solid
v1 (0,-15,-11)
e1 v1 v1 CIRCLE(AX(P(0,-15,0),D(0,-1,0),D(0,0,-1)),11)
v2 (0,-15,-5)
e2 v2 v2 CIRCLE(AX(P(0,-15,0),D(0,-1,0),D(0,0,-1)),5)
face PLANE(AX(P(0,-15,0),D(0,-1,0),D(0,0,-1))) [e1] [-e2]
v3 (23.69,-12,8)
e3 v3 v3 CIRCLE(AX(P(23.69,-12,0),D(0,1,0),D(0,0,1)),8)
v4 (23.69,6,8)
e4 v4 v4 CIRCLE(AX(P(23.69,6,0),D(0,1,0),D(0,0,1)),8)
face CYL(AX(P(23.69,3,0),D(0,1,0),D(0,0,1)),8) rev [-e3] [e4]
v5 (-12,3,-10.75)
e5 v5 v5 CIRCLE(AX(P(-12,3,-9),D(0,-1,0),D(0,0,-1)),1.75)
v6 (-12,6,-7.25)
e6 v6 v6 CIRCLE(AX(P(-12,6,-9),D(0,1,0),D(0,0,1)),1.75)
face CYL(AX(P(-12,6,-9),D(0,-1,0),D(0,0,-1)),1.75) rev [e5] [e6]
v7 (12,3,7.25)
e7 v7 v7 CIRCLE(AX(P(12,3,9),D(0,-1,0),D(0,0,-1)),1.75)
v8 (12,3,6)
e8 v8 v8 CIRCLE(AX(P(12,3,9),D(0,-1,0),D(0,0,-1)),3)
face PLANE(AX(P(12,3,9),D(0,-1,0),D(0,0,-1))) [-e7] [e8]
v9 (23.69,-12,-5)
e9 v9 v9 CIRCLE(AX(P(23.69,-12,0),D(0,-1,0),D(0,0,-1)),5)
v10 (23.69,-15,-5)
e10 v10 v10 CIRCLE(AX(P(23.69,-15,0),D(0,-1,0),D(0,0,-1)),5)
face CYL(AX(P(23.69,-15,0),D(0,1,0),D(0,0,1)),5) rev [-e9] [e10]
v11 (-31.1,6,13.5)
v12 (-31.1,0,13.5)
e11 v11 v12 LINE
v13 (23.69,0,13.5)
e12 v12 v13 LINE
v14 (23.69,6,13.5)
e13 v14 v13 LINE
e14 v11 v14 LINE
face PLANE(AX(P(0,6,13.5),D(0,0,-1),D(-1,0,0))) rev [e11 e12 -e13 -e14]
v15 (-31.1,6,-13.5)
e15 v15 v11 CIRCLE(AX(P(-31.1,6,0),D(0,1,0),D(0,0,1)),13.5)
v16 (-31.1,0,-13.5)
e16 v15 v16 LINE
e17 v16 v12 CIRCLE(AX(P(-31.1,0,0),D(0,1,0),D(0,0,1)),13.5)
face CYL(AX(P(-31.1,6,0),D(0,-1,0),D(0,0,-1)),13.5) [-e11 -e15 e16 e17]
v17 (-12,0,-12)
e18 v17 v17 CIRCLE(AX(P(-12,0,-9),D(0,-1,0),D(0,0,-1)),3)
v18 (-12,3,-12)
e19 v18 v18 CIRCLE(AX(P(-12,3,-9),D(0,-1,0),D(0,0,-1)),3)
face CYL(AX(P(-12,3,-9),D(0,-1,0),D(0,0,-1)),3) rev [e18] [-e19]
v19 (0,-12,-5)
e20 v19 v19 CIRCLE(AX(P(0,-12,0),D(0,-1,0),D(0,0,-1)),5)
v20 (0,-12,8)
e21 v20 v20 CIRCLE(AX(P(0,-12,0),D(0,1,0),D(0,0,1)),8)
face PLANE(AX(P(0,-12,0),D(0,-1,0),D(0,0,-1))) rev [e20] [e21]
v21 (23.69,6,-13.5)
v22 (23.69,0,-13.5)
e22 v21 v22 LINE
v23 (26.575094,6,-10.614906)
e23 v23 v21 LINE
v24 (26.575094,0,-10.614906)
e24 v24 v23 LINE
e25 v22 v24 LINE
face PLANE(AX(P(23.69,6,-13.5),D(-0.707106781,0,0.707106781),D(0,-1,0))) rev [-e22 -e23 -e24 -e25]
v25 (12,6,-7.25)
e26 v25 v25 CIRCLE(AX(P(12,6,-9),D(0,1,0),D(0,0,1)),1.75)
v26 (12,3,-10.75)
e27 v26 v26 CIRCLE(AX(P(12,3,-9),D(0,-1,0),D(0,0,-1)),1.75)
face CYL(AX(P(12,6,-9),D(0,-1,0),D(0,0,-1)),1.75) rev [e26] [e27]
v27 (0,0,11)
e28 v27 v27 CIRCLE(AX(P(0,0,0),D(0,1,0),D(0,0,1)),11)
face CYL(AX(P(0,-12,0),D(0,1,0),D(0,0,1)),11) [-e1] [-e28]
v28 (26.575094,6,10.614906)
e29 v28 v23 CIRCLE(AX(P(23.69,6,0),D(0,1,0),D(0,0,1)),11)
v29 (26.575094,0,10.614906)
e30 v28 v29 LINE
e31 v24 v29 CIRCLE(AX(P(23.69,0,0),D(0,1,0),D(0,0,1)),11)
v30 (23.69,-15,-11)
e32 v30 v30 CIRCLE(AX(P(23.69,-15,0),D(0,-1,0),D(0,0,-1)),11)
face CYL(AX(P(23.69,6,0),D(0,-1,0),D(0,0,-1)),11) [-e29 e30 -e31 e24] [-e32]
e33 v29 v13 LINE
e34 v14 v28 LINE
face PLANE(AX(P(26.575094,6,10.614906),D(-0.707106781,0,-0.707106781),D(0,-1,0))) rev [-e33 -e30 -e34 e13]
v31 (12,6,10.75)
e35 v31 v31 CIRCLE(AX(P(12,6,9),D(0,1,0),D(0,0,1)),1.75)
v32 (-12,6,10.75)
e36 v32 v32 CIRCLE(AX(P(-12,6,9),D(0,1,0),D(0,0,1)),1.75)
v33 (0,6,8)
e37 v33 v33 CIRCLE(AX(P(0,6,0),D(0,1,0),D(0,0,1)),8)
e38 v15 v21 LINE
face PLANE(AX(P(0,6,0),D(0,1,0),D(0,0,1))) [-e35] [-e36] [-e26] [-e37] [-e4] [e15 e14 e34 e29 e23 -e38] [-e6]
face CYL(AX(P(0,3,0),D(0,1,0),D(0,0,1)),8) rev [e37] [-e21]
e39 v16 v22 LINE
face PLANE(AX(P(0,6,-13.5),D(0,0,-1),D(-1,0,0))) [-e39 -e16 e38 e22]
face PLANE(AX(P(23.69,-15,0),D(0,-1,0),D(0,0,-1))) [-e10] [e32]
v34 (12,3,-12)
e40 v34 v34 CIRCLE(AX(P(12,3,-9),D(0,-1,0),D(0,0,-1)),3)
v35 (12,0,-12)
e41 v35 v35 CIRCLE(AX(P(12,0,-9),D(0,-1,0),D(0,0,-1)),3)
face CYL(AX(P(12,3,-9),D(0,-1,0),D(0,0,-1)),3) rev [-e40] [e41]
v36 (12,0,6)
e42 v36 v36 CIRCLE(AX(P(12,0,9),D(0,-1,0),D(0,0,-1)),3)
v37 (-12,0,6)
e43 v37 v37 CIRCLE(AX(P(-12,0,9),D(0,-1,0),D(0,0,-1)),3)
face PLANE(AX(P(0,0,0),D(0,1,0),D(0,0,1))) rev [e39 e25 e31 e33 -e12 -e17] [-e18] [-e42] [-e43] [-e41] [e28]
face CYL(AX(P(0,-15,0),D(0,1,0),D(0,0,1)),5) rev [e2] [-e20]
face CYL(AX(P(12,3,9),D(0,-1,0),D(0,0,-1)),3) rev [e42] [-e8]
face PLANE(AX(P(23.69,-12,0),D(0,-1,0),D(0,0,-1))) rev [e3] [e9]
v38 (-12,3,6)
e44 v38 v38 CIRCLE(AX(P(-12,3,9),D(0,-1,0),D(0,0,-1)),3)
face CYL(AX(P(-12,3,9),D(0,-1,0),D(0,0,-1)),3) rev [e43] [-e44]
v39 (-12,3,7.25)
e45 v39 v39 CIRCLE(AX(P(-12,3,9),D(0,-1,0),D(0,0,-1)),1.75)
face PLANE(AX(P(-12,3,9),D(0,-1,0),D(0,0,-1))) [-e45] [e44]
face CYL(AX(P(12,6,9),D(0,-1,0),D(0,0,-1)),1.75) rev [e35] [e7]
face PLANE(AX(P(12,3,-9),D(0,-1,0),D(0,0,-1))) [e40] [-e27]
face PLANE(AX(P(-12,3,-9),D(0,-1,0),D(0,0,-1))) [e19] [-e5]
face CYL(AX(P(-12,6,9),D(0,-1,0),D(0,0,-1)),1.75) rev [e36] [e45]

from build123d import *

# Parameters (mm, degrees)
SKETCH1_R               = 1.75
SKETCH1_R_2             = 5
BOSS_EXTRUDE1_DEPTH     = 6
SKETCH2_R               = 3
SKETCH2_R_2             = 1.75
CUT_EXTRUDE1_DEPTH      = 3
CUT_EXTRUDE2_START      = -3
SKETCH3_R               = 8
SKETCH3_R_2             = 5
CUT_EXTRUDE2_DEPTH      = 3
SKETCH5_R               = 13.5
BOSS_EXTRUDE2_DEPTH     = 6
CUT_EXTRUDE3_DEPTH      = 47.983082062
CUT_EXTRUDE3_DEPTH_BACK = 47.983082062
SKETCH6_R               = 8
BOSS_EXTRUDE6_START     = -12
SKETCH9_R               = 11
SKETCH9_R_2             = 8
BOSS_EXTRUDE6_DEPTH     = 12
BOSS_EXTRUDE7_START     = 3
SKETCH10_R              = 11
SKETCH10_R_2            = 5
BOSS_EXTRUDE7_DEPTH     = 3
CHAMFER3_SIZE           = 2.5


with BuildPart() as part:
    # Sketch1 → Boss-Extrude1 (new body)
    with BuildSketch(Plane(origin=(0, 0, 0), x_dir=(1, 0, 0), z_dir=(0, 1, 0))):
        with BuildLine():
            Line((23.69, 13.5), (-31.1, 13.5))
            Line((-31.1, 13.5), (-31.1, 10.5))
            ThreePointArc((-31.1, 10.5), (-20.6, 0), (-31.1, -10.5))
            Line((-31.1, -10.5), (-31.1, -13.5))
            Line((-31.1, -13.5), (23.69, -13.5))
            Line((23.69, -13.5), (23.69, -11))
            ThreePointArc((23.69, -11), (34.69, 0), (23.69, 11))
            Line((23.69, 11), (23.69, 13.5))
        make_face()
        with Locations(Location((-12, -9, 0), (0, 0, 270))):
            Circle(SKETCH1_R, mode=Mode.SUBTRACT)
        with Locations(Location((12, -9, 0), (0, 0, 270))):
            Circle(SKETCH1_R, mode=Mode.SUBTRACT)
        with Locations(Location((-12, 9, 0), (0, 0, 270))):
            Circle(SKETCH1_R, mode=Mode.SUBTRACT)
        with Locations(Location((0, 0, 0), (0, 0, 270))):
            Circle(SKETCH1_R_2, mode=Mode.SUBTRACT)
        with Locations(Location((12, 9, 0), (0, 0, 270))):
            Circle(SKETCH1_R, mode=Mode.SUBTRACT)
        with Locations(Location((23.69, 0, 0), (0, 0, 270))):
            Circle(SKETCH1_R_2, mode=Mode.SUBTRACT)
    extrude(amount=BOSS_EXTRUDE1_DEPTH)

    # Sketch2 → Cut-Extrude1 (cut)
    # profile 1 of 4: a face of its own
    with BuildSketch(Plane.XZ):
        with Locations(Location((-12, -9, 0), (0, 0, 270))):
            Circle(SKETCH2_R)
        with Locations(Location((-12, -9, 0), (0, 0, 270))):
            Circle(SKETCH2_R_2, mode=Mode.SUBTRACT)
    # profile 2 of 4: a face of its own
    with BuildSketch(Plane.XZ):
        with Locations(Location((-12, 9, 0), (0, 0, 270))):
            Circle(SKETCH2_R)
        with Locations(Location((-12, 9, 0), (0, 0, 270))):
            Circle(SKETCH2_R_2, mode=Mode.SUBTRACT)
    # profile 3 of 4: a face of its own
    with BuildSketch(Plane.XZ):
        with Locations(Location((12, 9, 0), (0, 0, 270))):
            Circle(SKETCH2_R)
        with Locations(Location((12, 9, 0), (0, 0, 270))):
            Circle(SKETCH2_R_2, mode=Mode.SUBTRACT)
    # profile 4 of 4: a face of its own
    with BuildSketch(Plane.XZ):
        with Locations(Location((12, -9, 0), (0, 0, 270))):
            Circle(SKETCH2_R)
        with Locations(Location((12, -9, 0), (0, 0, 270))):
            Circle(SKETCH2_R_2, mode=Mode.SUBTRACT)
    extrude(amount=-CUT_EXTRUDE1_DEPTH, mode=Mode.SUBTRACT)

    # Sketch3 → Cut-Extrude2 (cut)
    # profile 1 of 2: a face of its own
    with BuildSketch(Plane(origin=(0, 6, 0), x_dir=(1, 0, 0), z_dir=(0, 1, 0)).offset(CUT_EXTRUDE2_START)):
        with Locations(Location((0, 0, 0), (0, 0, 270))):
            Circle(SKETCH3_R)
        with Locations(Location((0, 0, 0), (0, 0, 270))):
            Circle(SKETCH3_R_2, mode=Mode.SUBTRACT)
    # profile 2 of 2: a face of its own
    with BuildSketch(Plane(origin=(0, 6, 0), x_dir=(1, 0, 0), z_dir=(0, 1, 0)).offset(CUT_EXTRUDE2_START)):
        with Locations(Location((23.69, 0, 0), (0, 0, 270))):
            Circle(SKETCH3_R)
        with Locations(Location((23.69, 0, 0), (0, 0, 270))):
            Circle(SKETCH3_R_2, mode=Mode.SUBTRACT)
    extrude(amount=CUT_EXTRUDE2_DEPTH, mode=Mode.SUBTRACT)

    # Sketch5 → Boss-Extrude2 (add)
    with BuildSketch(Plane(origin=(0, 0, 0), x_dir=(1, 0, 0), z_dir=(0, 1, 0))):
        with Locations((-31.1, 0)):
            Circle(SKETCH5_R)
    extrude(amount=BOSS_EXTRUDE2_DEPTH)

    # Sketch6 → Cut-Extrude3 (cut, two sides: drawn at the far end of the back side and taken through both)
    with BuildSketch(Plane(origin=(0, 6, 0), x_dir=(1, 0, 0), z_dir=(0, 1, 0)).offset(-CUT_EXTRUDE3_DEPTH_BACK)):
        with Locations(Location((0, 0, 0), (0, 0, 270))):
            Circle(SKETCH6_R)
        with Locations(Location((23.69, 0, 0), (0, 0, 270))):
            Circle(SKETCH6_R)
    extrude(amount=CUT_EXTRUDE3_DEPTH + CUT_EXTRUDE3_DEPTH_BACK, mode=Mode.SUBTRACT)

    # Sketch9 → Boss-Extrude6 (add)
    # profile 1 of 2: a face of its own
    with BuildSketch(Plane(origin=(0, 0, 0), x_dir=(1, 0, 0), z_dir=(0, 1, 0)).offset(BOSS_EXTRUDE6_START)):
        with Locations(Location((0, 0, 0), (0, 0, 270))):
            Circle(SKETCH9_R)
        with Locations(Location((0, 0, 0), (0, 0, 270))):
            Circle(SKETCH9_R_2, mode=Mode.SUBTRACT)
    # profile 2 of 2: a face of its own
    with BuildSketch(Plane(origin=(0, 0, 0), x_dir=(1, 0, 0), z_dir=(0, 1, 0)).offset(BOSS_EXTRUDE6_START)):
        with BuildLine():
            ThreePointArc((23.69, 11), (12.69, 0), (23.69, -11))
            ThreePointArc((23.69, -11), (31.468174593, -7.778174593), (34.69, 0))
            ThreePointArc((34.69, 0), (31.468174593, 7.778174593), (23.69, 11))
        make_face()
        with Locations(Location((23.69, 0, 0), (0, 0, 270))):
            Circle(SKETCH9_R_2, mode=Mode.SUBTRACT)
    extrude(amount=BOSS_EXTRUDE6_DEPTH)

    # Sketch10 → Boss-Extrude7 (add)
    # profile 1 of 2: a face of its own
    with BuildSketch(Plane.XZ.offset(12).offset(BOSS_EXTRUDE7_START)):
        with Locations(Location((23.69, 0, 0), (0, 0, 270))):
            Circle(SKETCH10_R)
        with Locations(Location((23.69, 0, 0), (0, 0, 270))):
            Circle(SKETCH10_R_2, mode=Mode.SUBTRACT)
    # profile 2 of 2: a face of its own
    with BuildSketch(Plane.XZ.offset(12).offset(BOSS_EXTRUDE7_START)):
        with Locations(Location((0, 0, 0), (0, 0, 90))):
            Circle(SKETCH10_R)
        with Locations(Location((0, 0, 0), (0, 0, 270))):
            Circle(SKETCH10_R_2, mode=Mode.SUBTRACT)
    extrude(amount=-BOSS_EXTRUDE7_DEPTH)

    # Chamfer3
    # the kernel refuses this chamfer: 2.5 mm, written as the material it adds along each edge
    with BuildSketch(Plane(origin=(23.69, 0, 11), x_dir=(0.9912092295509808, 0, -0.13230367815352337), z_dir=(0, 1, 0))) as chamfer3_piece_1_section:
        with BuildLine():
            Line((2.910680919, 0), (-CHAMFER3_SIZE * 0.132303678154, -CHAMFER3_SIZE * 0.991209229551))
            Line((-CHAMFER3_SIZE * 0.132303678154, -CHAMFER3_SIZE * 0.991209229551), (0, 0))
            ThreePointArc((0, 0), (1.49552658, -0.096625069), (2.910680919, 0))
        make_face()
    chamfer3_piece_1 = extrude(amount=6, mode=Mode.PRIVATE)
    chamfer3_piece_1 = split(chamfer3_piece_1, bisect_by=Plane(origin=(23.69, 0, 13.5), z_dir=(0, 0, -1)), keep=Keep.TOP, mode=Mode.PRIVATE)
    add(chamfer3_piece_1)
    with BuildSketch(Plane(origin=(23.69, 0, -11), x_dir=(0, 0, -1), z_dir=(0, 1, 0))) as chamfer3_piece_2_section:
        with BuildLine():
            Line((CHAMFER3_SIZE, 0), (-0.385093792, -2.885093792))
            ThreePointArc((-0.385093792, -2.885093792), (-0.102088007, -1.495163601), (0, 0))
            Line((0, 0), (CHAMFER3_SIZE, 0))
        make_face()
    chamfer3_piece_2 = extrude(amount=6, mode=Mode.PRIVATE)
    chamfer3_piece_2 = split(chamfer3_piece_2, bisect_by=Plane(origin=(23.69, 0, -13.5), z_dir=(0, 0, 1)), keep=Keep.TOP, mode=Mode.PRIVATE)
    add(chamfer3_piece_2)


solid = part.part
